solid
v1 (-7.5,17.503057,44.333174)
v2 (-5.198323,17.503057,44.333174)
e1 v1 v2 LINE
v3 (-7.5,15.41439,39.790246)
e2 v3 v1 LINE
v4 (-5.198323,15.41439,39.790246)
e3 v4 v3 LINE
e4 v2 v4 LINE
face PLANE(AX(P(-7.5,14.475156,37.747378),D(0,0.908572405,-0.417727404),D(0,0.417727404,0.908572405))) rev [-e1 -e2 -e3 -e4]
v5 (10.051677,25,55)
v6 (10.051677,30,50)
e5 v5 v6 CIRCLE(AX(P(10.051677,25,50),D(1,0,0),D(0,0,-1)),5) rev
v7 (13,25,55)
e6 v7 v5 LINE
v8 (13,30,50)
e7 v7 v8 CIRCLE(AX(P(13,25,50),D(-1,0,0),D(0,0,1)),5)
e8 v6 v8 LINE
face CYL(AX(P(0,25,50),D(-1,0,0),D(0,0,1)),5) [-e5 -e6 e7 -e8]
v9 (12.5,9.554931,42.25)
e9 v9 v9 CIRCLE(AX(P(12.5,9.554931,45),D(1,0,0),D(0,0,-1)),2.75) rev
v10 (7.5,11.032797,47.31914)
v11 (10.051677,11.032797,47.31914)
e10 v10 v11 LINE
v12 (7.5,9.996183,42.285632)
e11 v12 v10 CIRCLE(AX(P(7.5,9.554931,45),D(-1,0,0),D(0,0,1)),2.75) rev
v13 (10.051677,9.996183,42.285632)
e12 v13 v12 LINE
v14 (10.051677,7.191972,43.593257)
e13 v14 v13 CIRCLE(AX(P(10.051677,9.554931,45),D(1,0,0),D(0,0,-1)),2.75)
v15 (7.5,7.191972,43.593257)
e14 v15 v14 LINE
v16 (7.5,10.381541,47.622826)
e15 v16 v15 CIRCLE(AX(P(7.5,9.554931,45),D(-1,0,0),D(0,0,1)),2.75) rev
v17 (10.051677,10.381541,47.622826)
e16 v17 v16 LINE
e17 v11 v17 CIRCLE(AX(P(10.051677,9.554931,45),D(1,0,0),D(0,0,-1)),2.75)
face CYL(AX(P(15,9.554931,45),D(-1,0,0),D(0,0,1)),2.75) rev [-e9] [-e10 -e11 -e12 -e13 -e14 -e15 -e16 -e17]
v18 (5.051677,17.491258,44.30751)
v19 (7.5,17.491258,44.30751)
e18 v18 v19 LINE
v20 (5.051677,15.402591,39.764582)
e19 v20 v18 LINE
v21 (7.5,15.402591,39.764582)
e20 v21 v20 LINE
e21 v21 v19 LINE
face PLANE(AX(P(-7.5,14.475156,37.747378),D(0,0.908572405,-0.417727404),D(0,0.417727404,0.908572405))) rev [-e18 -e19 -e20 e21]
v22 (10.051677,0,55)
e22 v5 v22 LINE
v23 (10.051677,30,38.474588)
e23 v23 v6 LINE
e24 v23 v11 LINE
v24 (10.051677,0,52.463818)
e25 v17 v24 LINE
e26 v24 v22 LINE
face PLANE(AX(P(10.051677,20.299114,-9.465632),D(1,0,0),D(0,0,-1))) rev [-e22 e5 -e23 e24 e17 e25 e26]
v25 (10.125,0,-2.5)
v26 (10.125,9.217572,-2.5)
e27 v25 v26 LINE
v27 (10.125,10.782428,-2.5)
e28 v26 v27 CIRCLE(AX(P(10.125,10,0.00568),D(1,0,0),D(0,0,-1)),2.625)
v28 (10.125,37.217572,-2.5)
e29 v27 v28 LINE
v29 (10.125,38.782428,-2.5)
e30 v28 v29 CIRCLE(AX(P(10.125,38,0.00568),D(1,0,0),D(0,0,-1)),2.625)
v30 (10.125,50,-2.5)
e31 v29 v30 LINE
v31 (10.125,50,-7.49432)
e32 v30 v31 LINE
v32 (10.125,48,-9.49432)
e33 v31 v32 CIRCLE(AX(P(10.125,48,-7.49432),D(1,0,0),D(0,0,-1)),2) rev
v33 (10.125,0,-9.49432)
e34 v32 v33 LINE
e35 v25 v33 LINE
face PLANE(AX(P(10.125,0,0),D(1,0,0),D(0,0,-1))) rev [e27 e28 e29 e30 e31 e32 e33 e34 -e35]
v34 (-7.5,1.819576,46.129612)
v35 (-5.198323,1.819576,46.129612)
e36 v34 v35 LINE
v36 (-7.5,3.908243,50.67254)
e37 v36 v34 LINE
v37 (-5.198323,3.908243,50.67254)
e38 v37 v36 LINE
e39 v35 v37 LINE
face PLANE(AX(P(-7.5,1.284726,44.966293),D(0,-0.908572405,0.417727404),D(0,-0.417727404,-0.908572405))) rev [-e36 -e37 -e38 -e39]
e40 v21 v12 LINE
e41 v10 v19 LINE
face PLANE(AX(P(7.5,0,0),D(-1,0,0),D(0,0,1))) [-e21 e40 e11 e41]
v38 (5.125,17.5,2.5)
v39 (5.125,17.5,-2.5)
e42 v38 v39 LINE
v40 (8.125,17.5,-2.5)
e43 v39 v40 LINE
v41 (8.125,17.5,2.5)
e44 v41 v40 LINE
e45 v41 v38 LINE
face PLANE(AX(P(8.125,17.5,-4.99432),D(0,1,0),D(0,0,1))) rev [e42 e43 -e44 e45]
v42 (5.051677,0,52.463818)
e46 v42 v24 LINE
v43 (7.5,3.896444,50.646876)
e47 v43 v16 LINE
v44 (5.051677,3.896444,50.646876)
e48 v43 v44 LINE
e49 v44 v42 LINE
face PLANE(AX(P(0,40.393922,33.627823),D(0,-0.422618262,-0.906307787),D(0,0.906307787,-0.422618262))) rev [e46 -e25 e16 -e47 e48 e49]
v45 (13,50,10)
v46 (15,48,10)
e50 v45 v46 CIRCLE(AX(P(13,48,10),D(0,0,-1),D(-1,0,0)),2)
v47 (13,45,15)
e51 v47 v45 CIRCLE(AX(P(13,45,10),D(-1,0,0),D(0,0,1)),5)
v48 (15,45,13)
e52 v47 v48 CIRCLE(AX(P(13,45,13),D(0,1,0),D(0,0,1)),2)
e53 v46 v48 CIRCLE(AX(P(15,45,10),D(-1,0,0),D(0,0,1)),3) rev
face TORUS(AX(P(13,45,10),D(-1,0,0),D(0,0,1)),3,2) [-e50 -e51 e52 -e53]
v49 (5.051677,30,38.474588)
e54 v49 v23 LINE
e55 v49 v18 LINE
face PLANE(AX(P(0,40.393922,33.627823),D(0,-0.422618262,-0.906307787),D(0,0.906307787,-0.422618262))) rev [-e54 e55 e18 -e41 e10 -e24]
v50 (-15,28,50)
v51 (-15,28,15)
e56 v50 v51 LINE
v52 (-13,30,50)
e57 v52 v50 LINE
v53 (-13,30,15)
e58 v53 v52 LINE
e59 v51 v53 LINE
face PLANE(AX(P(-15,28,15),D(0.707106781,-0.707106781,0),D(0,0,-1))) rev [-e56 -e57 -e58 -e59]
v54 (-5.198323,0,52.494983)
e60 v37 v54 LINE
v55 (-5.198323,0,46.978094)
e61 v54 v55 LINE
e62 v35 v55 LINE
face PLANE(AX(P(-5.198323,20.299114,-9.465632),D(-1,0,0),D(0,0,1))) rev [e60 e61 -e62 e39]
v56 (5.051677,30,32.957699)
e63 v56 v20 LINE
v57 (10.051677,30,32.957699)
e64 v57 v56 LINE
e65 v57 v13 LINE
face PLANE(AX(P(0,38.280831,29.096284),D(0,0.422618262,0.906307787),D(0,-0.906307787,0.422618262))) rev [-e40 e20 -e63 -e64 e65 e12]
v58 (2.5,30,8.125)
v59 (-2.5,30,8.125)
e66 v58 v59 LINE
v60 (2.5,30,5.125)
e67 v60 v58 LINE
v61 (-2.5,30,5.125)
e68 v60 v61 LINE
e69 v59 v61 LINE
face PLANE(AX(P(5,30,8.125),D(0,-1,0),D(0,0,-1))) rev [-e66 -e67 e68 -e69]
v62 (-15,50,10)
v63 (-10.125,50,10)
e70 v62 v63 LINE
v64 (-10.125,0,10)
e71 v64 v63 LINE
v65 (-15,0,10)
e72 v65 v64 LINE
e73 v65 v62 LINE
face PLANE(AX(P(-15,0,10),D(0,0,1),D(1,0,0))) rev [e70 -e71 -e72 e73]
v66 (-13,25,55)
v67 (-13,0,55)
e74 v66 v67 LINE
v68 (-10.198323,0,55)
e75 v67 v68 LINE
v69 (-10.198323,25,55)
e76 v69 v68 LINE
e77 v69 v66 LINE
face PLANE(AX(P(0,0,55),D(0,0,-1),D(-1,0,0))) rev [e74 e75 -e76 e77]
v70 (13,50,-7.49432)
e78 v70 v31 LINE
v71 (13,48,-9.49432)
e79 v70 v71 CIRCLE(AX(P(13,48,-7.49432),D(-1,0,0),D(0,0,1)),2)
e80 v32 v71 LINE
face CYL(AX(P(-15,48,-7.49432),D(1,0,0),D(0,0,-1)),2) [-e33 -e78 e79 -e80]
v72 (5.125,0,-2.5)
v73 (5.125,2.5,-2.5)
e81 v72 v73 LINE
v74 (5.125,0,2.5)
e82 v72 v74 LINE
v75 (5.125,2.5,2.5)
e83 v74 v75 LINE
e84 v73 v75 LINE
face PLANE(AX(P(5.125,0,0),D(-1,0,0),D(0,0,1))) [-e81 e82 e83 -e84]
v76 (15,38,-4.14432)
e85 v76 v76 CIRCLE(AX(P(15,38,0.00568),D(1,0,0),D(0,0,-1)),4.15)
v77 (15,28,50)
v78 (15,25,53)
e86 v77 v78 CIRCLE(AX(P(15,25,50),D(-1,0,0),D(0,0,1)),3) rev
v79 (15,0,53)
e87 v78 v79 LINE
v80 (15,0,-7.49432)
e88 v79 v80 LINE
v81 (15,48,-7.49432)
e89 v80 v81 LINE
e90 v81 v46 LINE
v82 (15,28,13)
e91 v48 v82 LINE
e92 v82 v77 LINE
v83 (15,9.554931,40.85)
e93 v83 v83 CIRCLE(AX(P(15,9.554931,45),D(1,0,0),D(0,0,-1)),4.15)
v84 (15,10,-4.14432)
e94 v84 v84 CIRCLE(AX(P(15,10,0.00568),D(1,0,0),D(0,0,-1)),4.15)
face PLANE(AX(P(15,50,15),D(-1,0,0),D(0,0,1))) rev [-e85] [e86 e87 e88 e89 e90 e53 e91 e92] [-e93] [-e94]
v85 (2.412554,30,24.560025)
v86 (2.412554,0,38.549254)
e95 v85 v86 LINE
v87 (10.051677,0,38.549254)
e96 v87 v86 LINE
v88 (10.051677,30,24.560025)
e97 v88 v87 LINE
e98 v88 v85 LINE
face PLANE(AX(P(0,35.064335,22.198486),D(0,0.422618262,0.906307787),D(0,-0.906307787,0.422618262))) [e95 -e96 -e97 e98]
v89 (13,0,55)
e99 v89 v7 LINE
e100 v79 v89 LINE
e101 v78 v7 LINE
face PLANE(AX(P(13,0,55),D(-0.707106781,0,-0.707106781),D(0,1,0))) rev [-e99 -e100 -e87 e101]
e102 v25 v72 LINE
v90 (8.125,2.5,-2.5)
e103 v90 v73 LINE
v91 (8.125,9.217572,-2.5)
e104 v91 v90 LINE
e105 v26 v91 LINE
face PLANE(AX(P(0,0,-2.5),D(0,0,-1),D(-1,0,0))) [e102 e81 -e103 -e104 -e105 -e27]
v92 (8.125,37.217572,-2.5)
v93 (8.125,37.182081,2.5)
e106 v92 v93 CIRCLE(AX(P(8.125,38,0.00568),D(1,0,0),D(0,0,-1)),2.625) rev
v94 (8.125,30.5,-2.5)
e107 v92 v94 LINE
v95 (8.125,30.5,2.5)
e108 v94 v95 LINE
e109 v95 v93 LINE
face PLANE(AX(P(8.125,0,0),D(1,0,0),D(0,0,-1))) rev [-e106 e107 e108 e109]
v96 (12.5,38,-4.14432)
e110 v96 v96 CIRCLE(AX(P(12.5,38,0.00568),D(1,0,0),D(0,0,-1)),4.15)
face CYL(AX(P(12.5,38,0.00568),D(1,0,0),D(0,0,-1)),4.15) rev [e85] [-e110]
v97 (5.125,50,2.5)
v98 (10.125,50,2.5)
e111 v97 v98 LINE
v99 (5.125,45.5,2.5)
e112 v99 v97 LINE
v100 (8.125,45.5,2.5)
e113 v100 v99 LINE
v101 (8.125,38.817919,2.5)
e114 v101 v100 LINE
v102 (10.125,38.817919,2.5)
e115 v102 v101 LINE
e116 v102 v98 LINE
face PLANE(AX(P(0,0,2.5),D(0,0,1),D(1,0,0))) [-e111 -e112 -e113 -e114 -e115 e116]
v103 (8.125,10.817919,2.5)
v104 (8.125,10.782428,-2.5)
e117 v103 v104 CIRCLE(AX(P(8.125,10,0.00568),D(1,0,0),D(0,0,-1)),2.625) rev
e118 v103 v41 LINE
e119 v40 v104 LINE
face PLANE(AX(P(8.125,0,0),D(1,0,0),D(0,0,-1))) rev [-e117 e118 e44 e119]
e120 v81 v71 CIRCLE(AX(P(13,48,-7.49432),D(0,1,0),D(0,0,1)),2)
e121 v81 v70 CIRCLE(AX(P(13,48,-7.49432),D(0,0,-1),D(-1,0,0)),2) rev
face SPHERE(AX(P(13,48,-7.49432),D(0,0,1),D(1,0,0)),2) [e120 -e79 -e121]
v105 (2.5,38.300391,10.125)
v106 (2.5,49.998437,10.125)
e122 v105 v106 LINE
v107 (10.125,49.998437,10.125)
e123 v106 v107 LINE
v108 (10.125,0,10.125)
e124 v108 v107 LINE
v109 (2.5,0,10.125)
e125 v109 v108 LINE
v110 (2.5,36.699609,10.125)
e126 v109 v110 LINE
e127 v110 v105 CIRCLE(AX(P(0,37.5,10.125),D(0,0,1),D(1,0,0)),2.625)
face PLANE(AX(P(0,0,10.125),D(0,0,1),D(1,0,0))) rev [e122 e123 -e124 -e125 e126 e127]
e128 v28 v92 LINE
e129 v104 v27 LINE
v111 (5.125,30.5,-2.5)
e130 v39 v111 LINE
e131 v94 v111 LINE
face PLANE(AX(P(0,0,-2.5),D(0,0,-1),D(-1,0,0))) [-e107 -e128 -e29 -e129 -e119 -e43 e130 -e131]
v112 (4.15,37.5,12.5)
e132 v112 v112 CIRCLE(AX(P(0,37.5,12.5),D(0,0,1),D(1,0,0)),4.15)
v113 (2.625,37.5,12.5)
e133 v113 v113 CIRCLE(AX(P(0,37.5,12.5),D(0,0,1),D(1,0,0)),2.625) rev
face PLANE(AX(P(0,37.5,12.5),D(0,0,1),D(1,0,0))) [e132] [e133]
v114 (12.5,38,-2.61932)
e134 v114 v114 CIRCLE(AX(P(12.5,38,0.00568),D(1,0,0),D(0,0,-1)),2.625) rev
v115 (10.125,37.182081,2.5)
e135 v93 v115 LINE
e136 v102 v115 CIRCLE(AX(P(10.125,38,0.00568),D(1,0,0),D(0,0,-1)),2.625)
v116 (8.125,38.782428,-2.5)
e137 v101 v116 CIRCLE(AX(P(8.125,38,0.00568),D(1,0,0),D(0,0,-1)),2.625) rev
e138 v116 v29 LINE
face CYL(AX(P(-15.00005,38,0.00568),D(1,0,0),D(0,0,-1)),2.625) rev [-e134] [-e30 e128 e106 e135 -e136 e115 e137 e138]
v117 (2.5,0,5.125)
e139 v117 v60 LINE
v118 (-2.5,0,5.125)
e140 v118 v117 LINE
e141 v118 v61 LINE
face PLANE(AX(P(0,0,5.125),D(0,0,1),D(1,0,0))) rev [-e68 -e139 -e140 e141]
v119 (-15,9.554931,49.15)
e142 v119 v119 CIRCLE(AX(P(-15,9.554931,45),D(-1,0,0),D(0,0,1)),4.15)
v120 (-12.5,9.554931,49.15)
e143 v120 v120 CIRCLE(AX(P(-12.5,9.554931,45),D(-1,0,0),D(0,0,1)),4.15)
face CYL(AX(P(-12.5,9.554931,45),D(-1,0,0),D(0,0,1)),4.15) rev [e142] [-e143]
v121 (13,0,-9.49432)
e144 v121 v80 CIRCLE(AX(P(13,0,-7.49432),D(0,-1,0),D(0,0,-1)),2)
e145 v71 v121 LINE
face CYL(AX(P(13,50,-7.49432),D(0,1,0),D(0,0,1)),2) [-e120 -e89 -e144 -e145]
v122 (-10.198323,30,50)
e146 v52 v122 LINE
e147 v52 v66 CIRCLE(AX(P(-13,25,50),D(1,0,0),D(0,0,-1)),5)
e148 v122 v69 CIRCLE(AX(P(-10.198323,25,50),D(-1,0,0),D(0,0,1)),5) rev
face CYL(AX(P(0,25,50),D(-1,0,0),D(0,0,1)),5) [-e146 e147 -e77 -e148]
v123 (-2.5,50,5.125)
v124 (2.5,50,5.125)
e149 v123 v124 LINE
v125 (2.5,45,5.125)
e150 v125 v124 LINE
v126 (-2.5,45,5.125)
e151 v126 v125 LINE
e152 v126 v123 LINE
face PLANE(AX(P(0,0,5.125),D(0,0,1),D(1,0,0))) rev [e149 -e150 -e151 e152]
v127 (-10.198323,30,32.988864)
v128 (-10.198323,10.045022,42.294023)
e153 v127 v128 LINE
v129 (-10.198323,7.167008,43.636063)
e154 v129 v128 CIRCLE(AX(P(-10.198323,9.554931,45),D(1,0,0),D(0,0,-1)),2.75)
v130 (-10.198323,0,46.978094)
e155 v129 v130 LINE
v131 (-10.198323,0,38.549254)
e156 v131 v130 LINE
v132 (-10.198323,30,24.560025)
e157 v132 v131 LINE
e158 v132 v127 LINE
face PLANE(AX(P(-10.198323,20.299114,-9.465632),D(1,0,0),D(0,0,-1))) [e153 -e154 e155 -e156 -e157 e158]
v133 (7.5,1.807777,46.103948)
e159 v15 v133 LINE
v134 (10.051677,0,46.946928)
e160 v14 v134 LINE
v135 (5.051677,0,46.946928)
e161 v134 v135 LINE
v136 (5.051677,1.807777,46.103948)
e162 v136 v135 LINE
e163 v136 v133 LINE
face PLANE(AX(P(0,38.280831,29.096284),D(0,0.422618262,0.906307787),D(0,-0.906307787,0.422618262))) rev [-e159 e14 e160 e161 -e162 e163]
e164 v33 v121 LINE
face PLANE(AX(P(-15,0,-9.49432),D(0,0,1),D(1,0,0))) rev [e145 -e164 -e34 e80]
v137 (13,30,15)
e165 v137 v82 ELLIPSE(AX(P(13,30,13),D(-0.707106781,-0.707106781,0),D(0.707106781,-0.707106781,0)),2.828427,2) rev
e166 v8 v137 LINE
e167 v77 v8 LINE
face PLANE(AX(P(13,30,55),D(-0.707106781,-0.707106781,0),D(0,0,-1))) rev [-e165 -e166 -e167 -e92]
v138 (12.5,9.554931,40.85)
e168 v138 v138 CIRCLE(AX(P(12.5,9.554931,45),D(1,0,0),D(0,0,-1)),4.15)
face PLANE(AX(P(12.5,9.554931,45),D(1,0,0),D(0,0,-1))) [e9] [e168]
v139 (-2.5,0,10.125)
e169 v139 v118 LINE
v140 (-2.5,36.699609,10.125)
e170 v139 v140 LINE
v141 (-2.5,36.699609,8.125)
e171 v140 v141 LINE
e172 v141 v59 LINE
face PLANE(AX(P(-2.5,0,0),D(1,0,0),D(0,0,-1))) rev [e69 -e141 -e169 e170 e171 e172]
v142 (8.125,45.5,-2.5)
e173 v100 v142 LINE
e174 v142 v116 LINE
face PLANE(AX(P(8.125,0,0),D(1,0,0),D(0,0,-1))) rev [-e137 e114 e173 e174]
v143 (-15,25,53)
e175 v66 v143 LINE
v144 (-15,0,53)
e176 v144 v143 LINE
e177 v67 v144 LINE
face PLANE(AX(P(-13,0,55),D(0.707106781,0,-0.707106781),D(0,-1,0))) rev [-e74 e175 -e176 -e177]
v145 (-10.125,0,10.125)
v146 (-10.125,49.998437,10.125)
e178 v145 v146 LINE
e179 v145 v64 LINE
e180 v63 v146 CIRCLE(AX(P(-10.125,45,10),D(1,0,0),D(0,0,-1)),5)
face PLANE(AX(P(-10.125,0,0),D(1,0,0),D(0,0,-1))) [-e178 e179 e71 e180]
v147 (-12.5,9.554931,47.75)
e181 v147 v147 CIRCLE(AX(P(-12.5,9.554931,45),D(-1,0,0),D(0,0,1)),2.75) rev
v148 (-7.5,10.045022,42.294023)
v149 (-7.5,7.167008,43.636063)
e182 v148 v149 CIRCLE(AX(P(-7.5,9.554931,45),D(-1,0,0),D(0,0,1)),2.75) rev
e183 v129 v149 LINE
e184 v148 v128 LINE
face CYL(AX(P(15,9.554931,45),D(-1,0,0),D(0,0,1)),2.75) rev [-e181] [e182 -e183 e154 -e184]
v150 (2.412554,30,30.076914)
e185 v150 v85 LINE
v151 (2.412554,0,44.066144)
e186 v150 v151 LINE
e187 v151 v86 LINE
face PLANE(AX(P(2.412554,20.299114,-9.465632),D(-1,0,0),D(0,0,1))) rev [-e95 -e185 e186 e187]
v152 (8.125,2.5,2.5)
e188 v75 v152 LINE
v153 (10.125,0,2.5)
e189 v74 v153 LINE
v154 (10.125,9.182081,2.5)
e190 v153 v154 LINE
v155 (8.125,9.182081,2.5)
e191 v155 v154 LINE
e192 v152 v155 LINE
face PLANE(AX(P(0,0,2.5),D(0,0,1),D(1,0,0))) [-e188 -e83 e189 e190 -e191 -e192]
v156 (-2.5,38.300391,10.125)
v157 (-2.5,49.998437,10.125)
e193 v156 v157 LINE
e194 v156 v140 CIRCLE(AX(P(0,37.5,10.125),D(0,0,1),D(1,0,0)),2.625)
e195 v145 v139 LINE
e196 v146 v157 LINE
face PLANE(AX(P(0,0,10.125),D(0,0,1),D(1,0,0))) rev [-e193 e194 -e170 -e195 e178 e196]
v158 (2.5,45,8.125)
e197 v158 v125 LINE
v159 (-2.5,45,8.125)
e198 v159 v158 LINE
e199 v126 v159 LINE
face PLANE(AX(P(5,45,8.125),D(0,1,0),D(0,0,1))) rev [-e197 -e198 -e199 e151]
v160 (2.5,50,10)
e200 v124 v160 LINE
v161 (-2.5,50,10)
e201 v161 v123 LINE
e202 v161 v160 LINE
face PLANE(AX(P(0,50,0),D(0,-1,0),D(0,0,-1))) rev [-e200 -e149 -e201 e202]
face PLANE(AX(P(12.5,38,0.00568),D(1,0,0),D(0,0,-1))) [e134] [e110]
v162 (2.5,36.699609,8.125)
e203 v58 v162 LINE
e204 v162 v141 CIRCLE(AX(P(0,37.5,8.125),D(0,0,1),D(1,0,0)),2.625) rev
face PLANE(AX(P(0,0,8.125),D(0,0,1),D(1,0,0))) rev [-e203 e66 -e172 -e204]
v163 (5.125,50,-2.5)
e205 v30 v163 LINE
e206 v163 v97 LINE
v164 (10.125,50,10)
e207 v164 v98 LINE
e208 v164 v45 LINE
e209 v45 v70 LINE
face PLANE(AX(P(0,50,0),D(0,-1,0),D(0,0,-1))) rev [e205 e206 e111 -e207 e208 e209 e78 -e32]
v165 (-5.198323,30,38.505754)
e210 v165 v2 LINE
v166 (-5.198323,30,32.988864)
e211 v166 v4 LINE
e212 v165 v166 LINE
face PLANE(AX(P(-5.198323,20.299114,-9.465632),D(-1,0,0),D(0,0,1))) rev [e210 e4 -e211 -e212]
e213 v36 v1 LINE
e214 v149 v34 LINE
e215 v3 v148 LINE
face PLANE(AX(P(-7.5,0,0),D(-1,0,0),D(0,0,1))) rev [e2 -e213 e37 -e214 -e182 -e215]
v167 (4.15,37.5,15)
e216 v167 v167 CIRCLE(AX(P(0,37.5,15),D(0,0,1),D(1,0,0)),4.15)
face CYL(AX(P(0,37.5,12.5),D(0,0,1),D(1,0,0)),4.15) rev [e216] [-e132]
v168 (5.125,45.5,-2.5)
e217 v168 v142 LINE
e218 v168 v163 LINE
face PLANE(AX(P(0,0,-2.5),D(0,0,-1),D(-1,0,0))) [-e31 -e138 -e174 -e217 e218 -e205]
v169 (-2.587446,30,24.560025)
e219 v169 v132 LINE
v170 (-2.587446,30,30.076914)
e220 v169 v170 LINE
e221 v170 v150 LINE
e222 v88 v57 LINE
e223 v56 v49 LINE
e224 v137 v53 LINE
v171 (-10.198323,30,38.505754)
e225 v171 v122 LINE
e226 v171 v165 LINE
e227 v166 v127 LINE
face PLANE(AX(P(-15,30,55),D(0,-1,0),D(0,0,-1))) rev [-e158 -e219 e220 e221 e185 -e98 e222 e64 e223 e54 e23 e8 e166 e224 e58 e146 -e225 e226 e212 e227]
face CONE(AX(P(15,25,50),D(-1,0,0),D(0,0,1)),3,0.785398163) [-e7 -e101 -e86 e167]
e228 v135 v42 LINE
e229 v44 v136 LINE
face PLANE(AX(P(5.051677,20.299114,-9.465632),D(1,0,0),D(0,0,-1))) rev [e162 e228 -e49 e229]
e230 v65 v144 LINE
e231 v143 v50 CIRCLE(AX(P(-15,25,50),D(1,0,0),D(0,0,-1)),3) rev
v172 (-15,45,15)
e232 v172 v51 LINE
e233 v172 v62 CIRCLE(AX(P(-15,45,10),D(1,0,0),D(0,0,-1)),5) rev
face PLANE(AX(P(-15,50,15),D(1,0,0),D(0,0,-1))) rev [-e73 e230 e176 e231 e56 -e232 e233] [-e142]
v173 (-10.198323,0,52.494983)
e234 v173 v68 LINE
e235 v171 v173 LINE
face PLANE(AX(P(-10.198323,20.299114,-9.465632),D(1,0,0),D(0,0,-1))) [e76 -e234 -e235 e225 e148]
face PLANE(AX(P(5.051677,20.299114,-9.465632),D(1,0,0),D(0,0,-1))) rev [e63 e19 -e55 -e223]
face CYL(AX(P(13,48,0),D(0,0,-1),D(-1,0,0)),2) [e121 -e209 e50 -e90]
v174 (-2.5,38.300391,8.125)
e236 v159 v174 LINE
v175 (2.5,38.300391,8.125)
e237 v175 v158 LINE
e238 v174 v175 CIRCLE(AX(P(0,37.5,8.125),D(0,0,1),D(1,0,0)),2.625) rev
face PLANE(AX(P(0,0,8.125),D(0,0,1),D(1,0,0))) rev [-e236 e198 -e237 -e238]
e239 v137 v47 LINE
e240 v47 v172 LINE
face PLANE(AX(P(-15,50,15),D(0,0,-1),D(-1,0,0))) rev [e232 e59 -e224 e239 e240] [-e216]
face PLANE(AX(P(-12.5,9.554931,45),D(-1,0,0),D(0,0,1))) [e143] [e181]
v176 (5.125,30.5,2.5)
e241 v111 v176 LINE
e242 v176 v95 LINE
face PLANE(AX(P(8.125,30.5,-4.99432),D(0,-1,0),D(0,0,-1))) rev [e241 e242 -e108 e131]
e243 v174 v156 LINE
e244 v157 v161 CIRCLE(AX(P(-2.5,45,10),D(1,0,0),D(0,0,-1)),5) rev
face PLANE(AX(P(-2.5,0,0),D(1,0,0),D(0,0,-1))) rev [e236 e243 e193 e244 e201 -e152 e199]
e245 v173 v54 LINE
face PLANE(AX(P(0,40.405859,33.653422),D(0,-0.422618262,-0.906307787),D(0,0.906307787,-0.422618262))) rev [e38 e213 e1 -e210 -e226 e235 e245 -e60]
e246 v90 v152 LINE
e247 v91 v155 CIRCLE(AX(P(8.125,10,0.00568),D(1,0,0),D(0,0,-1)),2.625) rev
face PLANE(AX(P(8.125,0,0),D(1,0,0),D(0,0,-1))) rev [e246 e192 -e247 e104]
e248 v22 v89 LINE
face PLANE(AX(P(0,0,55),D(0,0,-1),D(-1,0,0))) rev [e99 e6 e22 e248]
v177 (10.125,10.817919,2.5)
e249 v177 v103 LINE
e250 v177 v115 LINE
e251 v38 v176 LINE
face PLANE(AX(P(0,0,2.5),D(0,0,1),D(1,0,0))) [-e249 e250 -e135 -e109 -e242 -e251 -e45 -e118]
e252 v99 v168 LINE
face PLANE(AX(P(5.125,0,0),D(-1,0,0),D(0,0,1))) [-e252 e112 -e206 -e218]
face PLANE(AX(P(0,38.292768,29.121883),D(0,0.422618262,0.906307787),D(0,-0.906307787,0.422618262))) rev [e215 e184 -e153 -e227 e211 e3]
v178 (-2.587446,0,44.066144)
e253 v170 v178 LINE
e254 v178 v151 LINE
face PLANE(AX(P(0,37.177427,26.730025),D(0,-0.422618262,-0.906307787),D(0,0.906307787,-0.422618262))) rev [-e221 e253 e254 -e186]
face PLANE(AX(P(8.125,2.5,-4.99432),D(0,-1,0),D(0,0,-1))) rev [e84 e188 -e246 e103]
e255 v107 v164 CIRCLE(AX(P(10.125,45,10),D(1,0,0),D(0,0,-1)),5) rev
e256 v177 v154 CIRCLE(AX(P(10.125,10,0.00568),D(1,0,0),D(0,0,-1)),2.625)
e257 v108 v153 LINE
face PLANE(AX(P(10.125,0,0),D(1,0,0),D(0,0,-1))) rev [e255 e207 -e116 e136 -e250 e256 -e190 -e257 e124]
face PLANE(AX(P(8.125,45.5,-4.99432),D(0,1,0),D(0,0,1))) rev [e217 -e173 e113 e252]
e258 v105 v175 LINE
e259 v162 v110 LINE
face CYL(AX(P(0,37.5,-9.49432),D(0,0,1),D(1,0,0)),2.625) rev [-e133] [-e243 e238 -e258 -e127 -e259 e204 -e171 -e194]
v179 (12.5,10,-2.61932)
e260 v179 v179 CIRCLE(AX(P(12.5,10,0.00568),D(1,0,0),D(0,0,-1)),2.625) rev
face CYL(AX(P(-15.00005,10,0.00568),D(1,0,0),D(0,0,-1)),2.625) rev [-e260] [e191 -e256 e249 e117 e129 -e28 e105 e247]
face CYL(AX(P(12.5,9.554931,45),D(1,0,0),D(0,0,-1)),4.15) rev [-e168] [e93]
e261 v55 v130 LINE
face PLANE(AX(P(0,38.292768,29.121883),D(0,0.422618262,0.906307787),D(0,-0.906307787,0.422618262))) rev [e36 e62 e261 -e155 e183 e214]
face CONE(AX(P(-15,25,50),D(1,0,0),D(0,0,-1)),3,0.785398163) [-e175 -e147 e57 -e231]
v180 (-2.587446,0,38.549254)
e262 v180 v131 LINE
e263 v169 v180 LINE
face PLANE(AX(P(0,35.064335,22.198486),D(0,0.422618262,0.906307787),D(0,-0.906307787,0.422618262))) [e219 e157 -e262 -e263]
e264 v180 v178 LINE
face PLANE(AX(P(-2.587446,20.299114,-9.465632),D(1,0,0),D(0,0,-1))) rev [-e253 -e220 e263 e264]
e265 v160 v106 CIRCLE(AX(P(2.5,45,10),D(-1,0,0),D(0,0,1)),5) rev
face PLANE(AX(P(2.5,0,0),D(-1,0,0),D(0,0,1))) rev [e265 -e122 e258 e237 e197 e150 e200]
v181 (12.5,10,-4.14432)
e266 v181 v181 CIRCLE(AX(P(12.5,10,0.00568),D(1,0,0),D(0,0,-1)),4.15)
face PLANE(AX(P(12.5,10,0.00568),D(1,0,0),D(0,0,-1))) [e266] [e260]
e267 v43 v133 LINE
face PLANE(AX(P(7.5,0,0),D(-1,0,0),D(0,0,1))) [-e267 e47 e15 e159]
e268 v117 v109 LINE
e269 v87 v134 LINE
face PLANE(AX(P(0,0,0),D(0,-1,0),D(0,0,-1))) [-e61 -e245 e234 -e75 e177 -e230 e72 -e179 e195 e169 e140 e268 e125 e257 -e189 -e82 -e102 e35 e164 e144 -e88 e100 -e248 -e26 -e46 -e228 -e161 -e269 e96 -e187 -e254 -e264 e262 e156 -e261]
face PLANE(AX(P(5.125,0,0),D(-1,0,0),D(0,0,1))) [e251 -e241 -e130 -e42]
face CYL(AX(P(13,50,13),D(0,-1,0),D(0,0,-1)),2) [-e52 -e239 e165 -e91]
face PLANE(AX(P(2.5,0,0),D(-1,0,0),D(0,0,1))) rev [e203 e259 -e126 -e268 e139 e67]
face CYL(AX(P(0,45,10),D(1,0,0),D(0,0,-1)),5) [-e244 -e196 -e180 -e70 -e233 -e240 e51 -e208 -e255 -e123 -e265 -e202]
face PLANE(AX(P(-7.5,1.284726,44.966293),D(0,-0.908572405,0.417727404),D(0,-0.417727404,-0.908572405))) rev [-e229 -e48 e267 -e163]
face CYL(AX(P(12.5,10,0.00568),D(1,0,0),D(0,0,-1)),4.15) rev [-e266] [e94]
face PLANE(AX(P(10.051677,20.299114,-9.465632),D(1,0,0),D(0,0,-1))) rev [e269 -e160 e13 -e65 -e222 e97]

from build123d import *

# Parameters (mm, degrees)
Z_EXTRUSION_MOUNT_W     = 30
Z_EXTRUSION_MOUNT_H     = 30
BOSS_EXTRUDE1_DEPTH     = 50
CUT_EXTRUDE1_DEPTH      = 50
SKETCH3_W               = 30
SKETCH3_H               = 5.505679799
CUT_EXTRUDE3_DEPTH      = 50
SKETCH4_W               = 30
SKETCH4_H               = 30
BOSS_EXTRUDE3_DEPTH     = 40
CUT_EXTRUDE4_DEPTH      = 10
CUT_EXTRUDE4_DEPTH_BACK = 62.479626952
FILLET1_R               = 5
FILLET2_R               = 5
SKETCH11_R              = 2.75
CUT_EXTRUDE14_DEPTH     = 30
SKETCH22_R              = 4.15
CUT_EXTRUDE17_DEPTH     = 2.5
CUT_EXTRUDE18_START     = -2.5
SKETCH23_R              = 4.15
CUT_EXTRUDE18_DEPTH     = 2.5
FILLET4_R               = 2
SKETCH24_W              = 4.875
SKETCH24_H              = 19.494320201
CUT_EXTRUDE19_DEPTH     = 76.828754441
SKETCH25_R              = 2.625
CUT_EXTRUDE20_DEPTH     = 81.156097709
SKETCH26_R              = 4.15
CUT_EXTRUDE21_DEPTH     = 2.5
SKETCH27_R              = 2.625
CUT_EXTRUDE23_DEPTH     = 66.76473219
SKETCH28_R              = 4.15
CUT_EXTRUDE24_DEPTH     = 2.5
SKETCH29_W              = 10
SKETCH29_H              = 15
CUT_EXTRUDE25_DEPTH     = 3
SKETCH31_W              = 10
SKETCH31_H              = 15
CUT_EXTRUDE27_DEPTH     = 3
SKETCH33_W              = 20.25
SKETCH33_H              = 10.783419854
CUT_EXTRUDE29_DEPTH     = 62.479626952
CUT_EXTRUDE30_DEPTH     = 7.5
CHAMFER1_SIZE           = 2
FILLET5_R               = 2


with BuildPart() as part:
    # Z extrusion mount → Boss-Extrude1 (new body)
    with BuildSketch(Plane(origin=(0, 0, 0), x_dir=(1, 0, 0), z_dir=(0, 1, 0))):
        Rectangle(Z_EXTRUSION_MOUNT_W, Z_EXTRUSION_MOUNT_H)
    extrude(amount=BOSS_EXTRUDE1_DEPTH)

    # Sketch2 → Cut-Extrude1 (cut)
    with BuildSketch(Plane(origin=(0, 50, 0), x_dir=(1, 0, 0), z_dir=(0, 1, 0))):
        Polygon((-10.125, 10.125), (-10.125, -10.125), (-2.5, -10.125), (-2.5, -5.125), (2.5, -5.125), (2.5, -10.125), (10.125, -10.125), (10.125, -2.5), (5.125, -2.5), (5.125, 2.5), (10.125, 2.5), (10.125, 10.125), align=None)
    extrude(amount=-CUT_EXTRUDE1_DEPTH, mode=Mode.SUBTRACT)

    # Sketch3 → Cut-Extrude3 (cut)
    with BuildSketch(Plane(origin=(0, 50, 0), x_dir=(1, 0, 0), z_dir=(0, 1, 0))):
        with Locations((0, 12.247160101)):
            Rectangle(SKETCH3_W, SKETCH3_H)
    extrude(amount=-CUT_EXTRUDE3_DEPTH, mode=Mode.SUBTRACT)

    # Sketch4 → Boss-Extrude3 (add)
    with BuildSketch(Plane.XY.offset(15)):
        with Locations((0, 15)):
            Rectangle(SKETCH4_W, SKETCH4_H)
    extrude(amount=BOSS_EXTRUDE3_DEPTH)

    # Sketch12 → Cut-Extrude4 (cut, two sides: drawn at the far end of the back side and taken through both)
    with BuildSketch(Plane(origin=(-15, 30, 35), x_dir=(-1, 0, 0), z_dir=(0, 0.9063077870366478, -0.42261826174070405)).offset(-CUT_EXTRUDE4_DEPTH_BACK)):
        Polygon((-25.051676804, -1.850953689), (-25.051676804, -9.461830913), (-17.412554028, -9.461830913), (-17.412554028, -4.461830913), (-12.412554028, -4.461830913), (-12.412554028, -9.461830913), (-4.801676804, -9.461830913), (-4.801676804, -1.822708137), (-9.801676804, -1.822708137), (-9.801676804, 3.177291863), (-4.801676804, 3.177291863), (-4.801676804, 10.788169087), (-12.440799581, 10.788169087), (-12.440799581, 5.788169087), (-17.440799581, 5.788169087), (-17.440799581, 10.788169087), (-25.051676804, 10.788169087), (-25.051676804, 3.149046311), (-20.051676804, 3.149046311), (-20.051676804, -1.850953689), align=None)
    extrude(amount=CUT_EXTRUDE4_DEPTH + CUT_EXTRUDE4_DEPTH_BACK, mode=Mode.SUBTRACT)

    # Fillet1
    fillet1_edges = [part.edges().sort_by_distance(p)[0] for p in [
        (0, 30, 55),
    ]]
    fillet(fillet1_edges, radius=FILLET1_R)

    # Fillet2
    # the kernel refuses this fillet: 5 mm, written as the material it takes off along each edge
    with BuildSketch(Plane(origin=(-27.5, 50, 15), x_dir=(0, -1, 0), z_dir=(1, 0, 0))) as fillet2_piece_1:
        with BuildLine():
            CenterArc((FILLET2_R, FILLET2_R), FILLET2_R, 180, 90)
            Line((0, FILLET2_R), (0, 0))
            Line((0, 0), (FILLET2_R, 0))
        make_face()
    extrude(amount=55, mode=Mode.SUBTRACT)

    # Sketch11 → Cut-Extrude14 (cut)
    with BuildSketch(Plane.ZY.offset(15)):
        with Locations((45, 9.554930795)):
            Circle(SKETCH11_R)
    extrude(amount=-CUT_EXTRUDE14_DEPTH, mode=Mode.SUBTRACT)

    # Sketch22 → Cut-Extrude17 (cut)
    with BuildSketch(Plane(origin=(15, 0, 0), x_dir=(0, 0, -1), z_dir=(1, 0, 0))):
        with Locations((-45, 9.554930795)):
            Circle(SKETCH22_R)
    extrude(amount=-CUT_EXTRUDE17_DEPTH, mode=Mode.SUBTRACT)

    # Sketch23 → Cut-Extrude18 (cut)
    with BuildSketch(Plane.ZY.offset(15).offset(CUT_EXTRUDE18_START)):
        with Locations(Location((45, 9.554930795, 0), (0, 0, 180))):
            Circle(SKETCH23_R)
    extrude(amount=CUT_EXTRUDE18_DEPTH, mode=Mode.SUBTRACT)

    # Fillet4
    fillet4_edges = [part.edges().sort_by_distance(p)[0] for p in [
        (15, 50, 0.252839899),
        (15, 48.535533906, 13.535533906),
        (15, 37.5, 15),
    ]]
    fillet(fillet4_edges, radius=FILLET4_R)

    # Sketch24 → Cut-Extrude19 (cut, through all)
    with BuildSketch(Plane(origin=(0, 50, 0), x_dir=(1, 0, 0), z_dir=(0, 1, 0))):
        with Locations((-12.5625, -0.252839899)):
            Rectangle(SKETCH24_W, SKETCH24_H)
    extrude(amount=-CUT_EXTRUDE19_DEPTH, mode=Mode.SUBTRACT)

    # Sketch25 → Cut-Extrude20 (cut, through all)
    with BuildSketch(Plane(origin=(15, 0, 0), x_dir=(0, 0, -1), z_dir=(1, 0, 0))):
        with Locations((-0.005679799, 38)):
            Circle(SKETCH25_R)
        with Locations((-0.005679799, 10)):
            Circle(SKETCH25_R)
    extrude(amount=-CUT_EXTRUDE20_DEPTH, mode=Mode.SUBTRACT)

    # Sketch26 → Cut-Extrude21 (cut)
    with BuildSketch(Plane(origin=(15, 0, 0), x_dir=(0, 0, -1), z_dir=(1, 0, 0))):
        with Locations((-0.005679799, 38)):
            Circle(SKETCH26_R)
        with Locations((-0.005679799, 10)):
            Circle(SKETCH26_R)
    extrude(amount=-CUT_EXTRUDE21_DEPTH, mode=Mode.SUBTRACT)

    # Sketch27 → Cut-Extrude23 (cut, through all)
    with BuildSketch(Plane.XY.offset(15)):
        with Locations((0, 37.5)):
            Circle(SKETCH27_R)
    extrude(amount=-CUT_EXTRUDE23_DEPTH, mode=Mode.SUBTRACT)

    # Sketch28 → Cut-Extrude24 (cut)
    with BuildSketch(Plane.XY.offset(15)):
        with Locations((0, 37.5)):
            Circle(SKETCH28_R)
    extrude(amount=-CUT_EXTRUDE24_DEPTH, mode=Mode.SUBTRACT)

    # Sketch29 → Cut-Extrude25 (cut)
    with BuildSketch(Plane(origin=(0, 0, 5.125), x_dir=(-1, 0, 0), z_dir=(0, 0, -1))):
        with Locations((0, 37.5)):
            Rectangle(SKETCH29_W, SKETCH29_H)
    extrude(amount=-CUT_EXTRUDE25_DEPTH, mode=Mode.SUBTRACT)

    # Sketch31 → Cut-Extrude27 (cut)
    with BuildSketch(Plane.ZY.offset(-5.125)):
        with Locations((0.005679799, 38)):
            Rectangle(SKETCH31_W, SKETCH31_H)
        with Locations((0.005679799, 10)):
            Rectangle(SKETCH31_W, SKETCH31_H)
    extrude(amount=-CUT_EXTRUDE27_DEPTH, mode=Mode.SUBTRACT)

    # Sketch33 → Cut-Extrude29 (cut, through all)
    with BuildSketch(Plane(origin=(-15, 30, 35), x_dir=(-1, 0, 0), z_dir=(0, 0.9063077870366478, -0.42261826174070405))):
        with Locations((-14.926676804, 11.08981557)):
            Rectangle(SKETCH33_W, SKETCH33_H)
    extrude(amount=-CUT_EXTRUDE29_DEPTH, mode=Mode.SUBTRACT)

    # Sketch35 → Cut-Extrude30 (cut, symmetric)
    with BuildSketch(Plane(origin=(0, 0, 0), x_dir=(0, 0, -1), z_dir=(1, 0, 0))):
        Polygon((-37.747378495, 14.475156436), (-45.033706868, 17.825136051), (-52.252621505, 4.634705153), (-44.966293132, 1.284725539), align=None)
    extrude(amount=CUT_EXTRUDE30_DEPTH, both=True, mode=Mode.SUBTRACT)

    # Chamfer1
    chamfer1_edges = [part.edges().sort_by_distance(p)[0] for p in [
        (15, 12.5, 55),
        (15, 28.535533906, 53.535533906),
        (15, 30, 31.5),
        (-15, 12.5, 55),
        (-15, 28.535533906, 53.535533906),
        (-15, 30, 32.5),
    ]]
    chamfer(chamfer1_edges, length=CHAMFER1_SIZE)

    # Fillet5
    fillet5_edges = [part.edges().sort_by_distance(p)[0] for p in [
        (14.414213562, 49.414213562, -9.494320201),
        (15, 24, -9.494320201),
        (11.5625, 50, -9.494320201),
    ]]
    fillet(fillet5_edges, radius=FILLET5_R)


solid = part.part
